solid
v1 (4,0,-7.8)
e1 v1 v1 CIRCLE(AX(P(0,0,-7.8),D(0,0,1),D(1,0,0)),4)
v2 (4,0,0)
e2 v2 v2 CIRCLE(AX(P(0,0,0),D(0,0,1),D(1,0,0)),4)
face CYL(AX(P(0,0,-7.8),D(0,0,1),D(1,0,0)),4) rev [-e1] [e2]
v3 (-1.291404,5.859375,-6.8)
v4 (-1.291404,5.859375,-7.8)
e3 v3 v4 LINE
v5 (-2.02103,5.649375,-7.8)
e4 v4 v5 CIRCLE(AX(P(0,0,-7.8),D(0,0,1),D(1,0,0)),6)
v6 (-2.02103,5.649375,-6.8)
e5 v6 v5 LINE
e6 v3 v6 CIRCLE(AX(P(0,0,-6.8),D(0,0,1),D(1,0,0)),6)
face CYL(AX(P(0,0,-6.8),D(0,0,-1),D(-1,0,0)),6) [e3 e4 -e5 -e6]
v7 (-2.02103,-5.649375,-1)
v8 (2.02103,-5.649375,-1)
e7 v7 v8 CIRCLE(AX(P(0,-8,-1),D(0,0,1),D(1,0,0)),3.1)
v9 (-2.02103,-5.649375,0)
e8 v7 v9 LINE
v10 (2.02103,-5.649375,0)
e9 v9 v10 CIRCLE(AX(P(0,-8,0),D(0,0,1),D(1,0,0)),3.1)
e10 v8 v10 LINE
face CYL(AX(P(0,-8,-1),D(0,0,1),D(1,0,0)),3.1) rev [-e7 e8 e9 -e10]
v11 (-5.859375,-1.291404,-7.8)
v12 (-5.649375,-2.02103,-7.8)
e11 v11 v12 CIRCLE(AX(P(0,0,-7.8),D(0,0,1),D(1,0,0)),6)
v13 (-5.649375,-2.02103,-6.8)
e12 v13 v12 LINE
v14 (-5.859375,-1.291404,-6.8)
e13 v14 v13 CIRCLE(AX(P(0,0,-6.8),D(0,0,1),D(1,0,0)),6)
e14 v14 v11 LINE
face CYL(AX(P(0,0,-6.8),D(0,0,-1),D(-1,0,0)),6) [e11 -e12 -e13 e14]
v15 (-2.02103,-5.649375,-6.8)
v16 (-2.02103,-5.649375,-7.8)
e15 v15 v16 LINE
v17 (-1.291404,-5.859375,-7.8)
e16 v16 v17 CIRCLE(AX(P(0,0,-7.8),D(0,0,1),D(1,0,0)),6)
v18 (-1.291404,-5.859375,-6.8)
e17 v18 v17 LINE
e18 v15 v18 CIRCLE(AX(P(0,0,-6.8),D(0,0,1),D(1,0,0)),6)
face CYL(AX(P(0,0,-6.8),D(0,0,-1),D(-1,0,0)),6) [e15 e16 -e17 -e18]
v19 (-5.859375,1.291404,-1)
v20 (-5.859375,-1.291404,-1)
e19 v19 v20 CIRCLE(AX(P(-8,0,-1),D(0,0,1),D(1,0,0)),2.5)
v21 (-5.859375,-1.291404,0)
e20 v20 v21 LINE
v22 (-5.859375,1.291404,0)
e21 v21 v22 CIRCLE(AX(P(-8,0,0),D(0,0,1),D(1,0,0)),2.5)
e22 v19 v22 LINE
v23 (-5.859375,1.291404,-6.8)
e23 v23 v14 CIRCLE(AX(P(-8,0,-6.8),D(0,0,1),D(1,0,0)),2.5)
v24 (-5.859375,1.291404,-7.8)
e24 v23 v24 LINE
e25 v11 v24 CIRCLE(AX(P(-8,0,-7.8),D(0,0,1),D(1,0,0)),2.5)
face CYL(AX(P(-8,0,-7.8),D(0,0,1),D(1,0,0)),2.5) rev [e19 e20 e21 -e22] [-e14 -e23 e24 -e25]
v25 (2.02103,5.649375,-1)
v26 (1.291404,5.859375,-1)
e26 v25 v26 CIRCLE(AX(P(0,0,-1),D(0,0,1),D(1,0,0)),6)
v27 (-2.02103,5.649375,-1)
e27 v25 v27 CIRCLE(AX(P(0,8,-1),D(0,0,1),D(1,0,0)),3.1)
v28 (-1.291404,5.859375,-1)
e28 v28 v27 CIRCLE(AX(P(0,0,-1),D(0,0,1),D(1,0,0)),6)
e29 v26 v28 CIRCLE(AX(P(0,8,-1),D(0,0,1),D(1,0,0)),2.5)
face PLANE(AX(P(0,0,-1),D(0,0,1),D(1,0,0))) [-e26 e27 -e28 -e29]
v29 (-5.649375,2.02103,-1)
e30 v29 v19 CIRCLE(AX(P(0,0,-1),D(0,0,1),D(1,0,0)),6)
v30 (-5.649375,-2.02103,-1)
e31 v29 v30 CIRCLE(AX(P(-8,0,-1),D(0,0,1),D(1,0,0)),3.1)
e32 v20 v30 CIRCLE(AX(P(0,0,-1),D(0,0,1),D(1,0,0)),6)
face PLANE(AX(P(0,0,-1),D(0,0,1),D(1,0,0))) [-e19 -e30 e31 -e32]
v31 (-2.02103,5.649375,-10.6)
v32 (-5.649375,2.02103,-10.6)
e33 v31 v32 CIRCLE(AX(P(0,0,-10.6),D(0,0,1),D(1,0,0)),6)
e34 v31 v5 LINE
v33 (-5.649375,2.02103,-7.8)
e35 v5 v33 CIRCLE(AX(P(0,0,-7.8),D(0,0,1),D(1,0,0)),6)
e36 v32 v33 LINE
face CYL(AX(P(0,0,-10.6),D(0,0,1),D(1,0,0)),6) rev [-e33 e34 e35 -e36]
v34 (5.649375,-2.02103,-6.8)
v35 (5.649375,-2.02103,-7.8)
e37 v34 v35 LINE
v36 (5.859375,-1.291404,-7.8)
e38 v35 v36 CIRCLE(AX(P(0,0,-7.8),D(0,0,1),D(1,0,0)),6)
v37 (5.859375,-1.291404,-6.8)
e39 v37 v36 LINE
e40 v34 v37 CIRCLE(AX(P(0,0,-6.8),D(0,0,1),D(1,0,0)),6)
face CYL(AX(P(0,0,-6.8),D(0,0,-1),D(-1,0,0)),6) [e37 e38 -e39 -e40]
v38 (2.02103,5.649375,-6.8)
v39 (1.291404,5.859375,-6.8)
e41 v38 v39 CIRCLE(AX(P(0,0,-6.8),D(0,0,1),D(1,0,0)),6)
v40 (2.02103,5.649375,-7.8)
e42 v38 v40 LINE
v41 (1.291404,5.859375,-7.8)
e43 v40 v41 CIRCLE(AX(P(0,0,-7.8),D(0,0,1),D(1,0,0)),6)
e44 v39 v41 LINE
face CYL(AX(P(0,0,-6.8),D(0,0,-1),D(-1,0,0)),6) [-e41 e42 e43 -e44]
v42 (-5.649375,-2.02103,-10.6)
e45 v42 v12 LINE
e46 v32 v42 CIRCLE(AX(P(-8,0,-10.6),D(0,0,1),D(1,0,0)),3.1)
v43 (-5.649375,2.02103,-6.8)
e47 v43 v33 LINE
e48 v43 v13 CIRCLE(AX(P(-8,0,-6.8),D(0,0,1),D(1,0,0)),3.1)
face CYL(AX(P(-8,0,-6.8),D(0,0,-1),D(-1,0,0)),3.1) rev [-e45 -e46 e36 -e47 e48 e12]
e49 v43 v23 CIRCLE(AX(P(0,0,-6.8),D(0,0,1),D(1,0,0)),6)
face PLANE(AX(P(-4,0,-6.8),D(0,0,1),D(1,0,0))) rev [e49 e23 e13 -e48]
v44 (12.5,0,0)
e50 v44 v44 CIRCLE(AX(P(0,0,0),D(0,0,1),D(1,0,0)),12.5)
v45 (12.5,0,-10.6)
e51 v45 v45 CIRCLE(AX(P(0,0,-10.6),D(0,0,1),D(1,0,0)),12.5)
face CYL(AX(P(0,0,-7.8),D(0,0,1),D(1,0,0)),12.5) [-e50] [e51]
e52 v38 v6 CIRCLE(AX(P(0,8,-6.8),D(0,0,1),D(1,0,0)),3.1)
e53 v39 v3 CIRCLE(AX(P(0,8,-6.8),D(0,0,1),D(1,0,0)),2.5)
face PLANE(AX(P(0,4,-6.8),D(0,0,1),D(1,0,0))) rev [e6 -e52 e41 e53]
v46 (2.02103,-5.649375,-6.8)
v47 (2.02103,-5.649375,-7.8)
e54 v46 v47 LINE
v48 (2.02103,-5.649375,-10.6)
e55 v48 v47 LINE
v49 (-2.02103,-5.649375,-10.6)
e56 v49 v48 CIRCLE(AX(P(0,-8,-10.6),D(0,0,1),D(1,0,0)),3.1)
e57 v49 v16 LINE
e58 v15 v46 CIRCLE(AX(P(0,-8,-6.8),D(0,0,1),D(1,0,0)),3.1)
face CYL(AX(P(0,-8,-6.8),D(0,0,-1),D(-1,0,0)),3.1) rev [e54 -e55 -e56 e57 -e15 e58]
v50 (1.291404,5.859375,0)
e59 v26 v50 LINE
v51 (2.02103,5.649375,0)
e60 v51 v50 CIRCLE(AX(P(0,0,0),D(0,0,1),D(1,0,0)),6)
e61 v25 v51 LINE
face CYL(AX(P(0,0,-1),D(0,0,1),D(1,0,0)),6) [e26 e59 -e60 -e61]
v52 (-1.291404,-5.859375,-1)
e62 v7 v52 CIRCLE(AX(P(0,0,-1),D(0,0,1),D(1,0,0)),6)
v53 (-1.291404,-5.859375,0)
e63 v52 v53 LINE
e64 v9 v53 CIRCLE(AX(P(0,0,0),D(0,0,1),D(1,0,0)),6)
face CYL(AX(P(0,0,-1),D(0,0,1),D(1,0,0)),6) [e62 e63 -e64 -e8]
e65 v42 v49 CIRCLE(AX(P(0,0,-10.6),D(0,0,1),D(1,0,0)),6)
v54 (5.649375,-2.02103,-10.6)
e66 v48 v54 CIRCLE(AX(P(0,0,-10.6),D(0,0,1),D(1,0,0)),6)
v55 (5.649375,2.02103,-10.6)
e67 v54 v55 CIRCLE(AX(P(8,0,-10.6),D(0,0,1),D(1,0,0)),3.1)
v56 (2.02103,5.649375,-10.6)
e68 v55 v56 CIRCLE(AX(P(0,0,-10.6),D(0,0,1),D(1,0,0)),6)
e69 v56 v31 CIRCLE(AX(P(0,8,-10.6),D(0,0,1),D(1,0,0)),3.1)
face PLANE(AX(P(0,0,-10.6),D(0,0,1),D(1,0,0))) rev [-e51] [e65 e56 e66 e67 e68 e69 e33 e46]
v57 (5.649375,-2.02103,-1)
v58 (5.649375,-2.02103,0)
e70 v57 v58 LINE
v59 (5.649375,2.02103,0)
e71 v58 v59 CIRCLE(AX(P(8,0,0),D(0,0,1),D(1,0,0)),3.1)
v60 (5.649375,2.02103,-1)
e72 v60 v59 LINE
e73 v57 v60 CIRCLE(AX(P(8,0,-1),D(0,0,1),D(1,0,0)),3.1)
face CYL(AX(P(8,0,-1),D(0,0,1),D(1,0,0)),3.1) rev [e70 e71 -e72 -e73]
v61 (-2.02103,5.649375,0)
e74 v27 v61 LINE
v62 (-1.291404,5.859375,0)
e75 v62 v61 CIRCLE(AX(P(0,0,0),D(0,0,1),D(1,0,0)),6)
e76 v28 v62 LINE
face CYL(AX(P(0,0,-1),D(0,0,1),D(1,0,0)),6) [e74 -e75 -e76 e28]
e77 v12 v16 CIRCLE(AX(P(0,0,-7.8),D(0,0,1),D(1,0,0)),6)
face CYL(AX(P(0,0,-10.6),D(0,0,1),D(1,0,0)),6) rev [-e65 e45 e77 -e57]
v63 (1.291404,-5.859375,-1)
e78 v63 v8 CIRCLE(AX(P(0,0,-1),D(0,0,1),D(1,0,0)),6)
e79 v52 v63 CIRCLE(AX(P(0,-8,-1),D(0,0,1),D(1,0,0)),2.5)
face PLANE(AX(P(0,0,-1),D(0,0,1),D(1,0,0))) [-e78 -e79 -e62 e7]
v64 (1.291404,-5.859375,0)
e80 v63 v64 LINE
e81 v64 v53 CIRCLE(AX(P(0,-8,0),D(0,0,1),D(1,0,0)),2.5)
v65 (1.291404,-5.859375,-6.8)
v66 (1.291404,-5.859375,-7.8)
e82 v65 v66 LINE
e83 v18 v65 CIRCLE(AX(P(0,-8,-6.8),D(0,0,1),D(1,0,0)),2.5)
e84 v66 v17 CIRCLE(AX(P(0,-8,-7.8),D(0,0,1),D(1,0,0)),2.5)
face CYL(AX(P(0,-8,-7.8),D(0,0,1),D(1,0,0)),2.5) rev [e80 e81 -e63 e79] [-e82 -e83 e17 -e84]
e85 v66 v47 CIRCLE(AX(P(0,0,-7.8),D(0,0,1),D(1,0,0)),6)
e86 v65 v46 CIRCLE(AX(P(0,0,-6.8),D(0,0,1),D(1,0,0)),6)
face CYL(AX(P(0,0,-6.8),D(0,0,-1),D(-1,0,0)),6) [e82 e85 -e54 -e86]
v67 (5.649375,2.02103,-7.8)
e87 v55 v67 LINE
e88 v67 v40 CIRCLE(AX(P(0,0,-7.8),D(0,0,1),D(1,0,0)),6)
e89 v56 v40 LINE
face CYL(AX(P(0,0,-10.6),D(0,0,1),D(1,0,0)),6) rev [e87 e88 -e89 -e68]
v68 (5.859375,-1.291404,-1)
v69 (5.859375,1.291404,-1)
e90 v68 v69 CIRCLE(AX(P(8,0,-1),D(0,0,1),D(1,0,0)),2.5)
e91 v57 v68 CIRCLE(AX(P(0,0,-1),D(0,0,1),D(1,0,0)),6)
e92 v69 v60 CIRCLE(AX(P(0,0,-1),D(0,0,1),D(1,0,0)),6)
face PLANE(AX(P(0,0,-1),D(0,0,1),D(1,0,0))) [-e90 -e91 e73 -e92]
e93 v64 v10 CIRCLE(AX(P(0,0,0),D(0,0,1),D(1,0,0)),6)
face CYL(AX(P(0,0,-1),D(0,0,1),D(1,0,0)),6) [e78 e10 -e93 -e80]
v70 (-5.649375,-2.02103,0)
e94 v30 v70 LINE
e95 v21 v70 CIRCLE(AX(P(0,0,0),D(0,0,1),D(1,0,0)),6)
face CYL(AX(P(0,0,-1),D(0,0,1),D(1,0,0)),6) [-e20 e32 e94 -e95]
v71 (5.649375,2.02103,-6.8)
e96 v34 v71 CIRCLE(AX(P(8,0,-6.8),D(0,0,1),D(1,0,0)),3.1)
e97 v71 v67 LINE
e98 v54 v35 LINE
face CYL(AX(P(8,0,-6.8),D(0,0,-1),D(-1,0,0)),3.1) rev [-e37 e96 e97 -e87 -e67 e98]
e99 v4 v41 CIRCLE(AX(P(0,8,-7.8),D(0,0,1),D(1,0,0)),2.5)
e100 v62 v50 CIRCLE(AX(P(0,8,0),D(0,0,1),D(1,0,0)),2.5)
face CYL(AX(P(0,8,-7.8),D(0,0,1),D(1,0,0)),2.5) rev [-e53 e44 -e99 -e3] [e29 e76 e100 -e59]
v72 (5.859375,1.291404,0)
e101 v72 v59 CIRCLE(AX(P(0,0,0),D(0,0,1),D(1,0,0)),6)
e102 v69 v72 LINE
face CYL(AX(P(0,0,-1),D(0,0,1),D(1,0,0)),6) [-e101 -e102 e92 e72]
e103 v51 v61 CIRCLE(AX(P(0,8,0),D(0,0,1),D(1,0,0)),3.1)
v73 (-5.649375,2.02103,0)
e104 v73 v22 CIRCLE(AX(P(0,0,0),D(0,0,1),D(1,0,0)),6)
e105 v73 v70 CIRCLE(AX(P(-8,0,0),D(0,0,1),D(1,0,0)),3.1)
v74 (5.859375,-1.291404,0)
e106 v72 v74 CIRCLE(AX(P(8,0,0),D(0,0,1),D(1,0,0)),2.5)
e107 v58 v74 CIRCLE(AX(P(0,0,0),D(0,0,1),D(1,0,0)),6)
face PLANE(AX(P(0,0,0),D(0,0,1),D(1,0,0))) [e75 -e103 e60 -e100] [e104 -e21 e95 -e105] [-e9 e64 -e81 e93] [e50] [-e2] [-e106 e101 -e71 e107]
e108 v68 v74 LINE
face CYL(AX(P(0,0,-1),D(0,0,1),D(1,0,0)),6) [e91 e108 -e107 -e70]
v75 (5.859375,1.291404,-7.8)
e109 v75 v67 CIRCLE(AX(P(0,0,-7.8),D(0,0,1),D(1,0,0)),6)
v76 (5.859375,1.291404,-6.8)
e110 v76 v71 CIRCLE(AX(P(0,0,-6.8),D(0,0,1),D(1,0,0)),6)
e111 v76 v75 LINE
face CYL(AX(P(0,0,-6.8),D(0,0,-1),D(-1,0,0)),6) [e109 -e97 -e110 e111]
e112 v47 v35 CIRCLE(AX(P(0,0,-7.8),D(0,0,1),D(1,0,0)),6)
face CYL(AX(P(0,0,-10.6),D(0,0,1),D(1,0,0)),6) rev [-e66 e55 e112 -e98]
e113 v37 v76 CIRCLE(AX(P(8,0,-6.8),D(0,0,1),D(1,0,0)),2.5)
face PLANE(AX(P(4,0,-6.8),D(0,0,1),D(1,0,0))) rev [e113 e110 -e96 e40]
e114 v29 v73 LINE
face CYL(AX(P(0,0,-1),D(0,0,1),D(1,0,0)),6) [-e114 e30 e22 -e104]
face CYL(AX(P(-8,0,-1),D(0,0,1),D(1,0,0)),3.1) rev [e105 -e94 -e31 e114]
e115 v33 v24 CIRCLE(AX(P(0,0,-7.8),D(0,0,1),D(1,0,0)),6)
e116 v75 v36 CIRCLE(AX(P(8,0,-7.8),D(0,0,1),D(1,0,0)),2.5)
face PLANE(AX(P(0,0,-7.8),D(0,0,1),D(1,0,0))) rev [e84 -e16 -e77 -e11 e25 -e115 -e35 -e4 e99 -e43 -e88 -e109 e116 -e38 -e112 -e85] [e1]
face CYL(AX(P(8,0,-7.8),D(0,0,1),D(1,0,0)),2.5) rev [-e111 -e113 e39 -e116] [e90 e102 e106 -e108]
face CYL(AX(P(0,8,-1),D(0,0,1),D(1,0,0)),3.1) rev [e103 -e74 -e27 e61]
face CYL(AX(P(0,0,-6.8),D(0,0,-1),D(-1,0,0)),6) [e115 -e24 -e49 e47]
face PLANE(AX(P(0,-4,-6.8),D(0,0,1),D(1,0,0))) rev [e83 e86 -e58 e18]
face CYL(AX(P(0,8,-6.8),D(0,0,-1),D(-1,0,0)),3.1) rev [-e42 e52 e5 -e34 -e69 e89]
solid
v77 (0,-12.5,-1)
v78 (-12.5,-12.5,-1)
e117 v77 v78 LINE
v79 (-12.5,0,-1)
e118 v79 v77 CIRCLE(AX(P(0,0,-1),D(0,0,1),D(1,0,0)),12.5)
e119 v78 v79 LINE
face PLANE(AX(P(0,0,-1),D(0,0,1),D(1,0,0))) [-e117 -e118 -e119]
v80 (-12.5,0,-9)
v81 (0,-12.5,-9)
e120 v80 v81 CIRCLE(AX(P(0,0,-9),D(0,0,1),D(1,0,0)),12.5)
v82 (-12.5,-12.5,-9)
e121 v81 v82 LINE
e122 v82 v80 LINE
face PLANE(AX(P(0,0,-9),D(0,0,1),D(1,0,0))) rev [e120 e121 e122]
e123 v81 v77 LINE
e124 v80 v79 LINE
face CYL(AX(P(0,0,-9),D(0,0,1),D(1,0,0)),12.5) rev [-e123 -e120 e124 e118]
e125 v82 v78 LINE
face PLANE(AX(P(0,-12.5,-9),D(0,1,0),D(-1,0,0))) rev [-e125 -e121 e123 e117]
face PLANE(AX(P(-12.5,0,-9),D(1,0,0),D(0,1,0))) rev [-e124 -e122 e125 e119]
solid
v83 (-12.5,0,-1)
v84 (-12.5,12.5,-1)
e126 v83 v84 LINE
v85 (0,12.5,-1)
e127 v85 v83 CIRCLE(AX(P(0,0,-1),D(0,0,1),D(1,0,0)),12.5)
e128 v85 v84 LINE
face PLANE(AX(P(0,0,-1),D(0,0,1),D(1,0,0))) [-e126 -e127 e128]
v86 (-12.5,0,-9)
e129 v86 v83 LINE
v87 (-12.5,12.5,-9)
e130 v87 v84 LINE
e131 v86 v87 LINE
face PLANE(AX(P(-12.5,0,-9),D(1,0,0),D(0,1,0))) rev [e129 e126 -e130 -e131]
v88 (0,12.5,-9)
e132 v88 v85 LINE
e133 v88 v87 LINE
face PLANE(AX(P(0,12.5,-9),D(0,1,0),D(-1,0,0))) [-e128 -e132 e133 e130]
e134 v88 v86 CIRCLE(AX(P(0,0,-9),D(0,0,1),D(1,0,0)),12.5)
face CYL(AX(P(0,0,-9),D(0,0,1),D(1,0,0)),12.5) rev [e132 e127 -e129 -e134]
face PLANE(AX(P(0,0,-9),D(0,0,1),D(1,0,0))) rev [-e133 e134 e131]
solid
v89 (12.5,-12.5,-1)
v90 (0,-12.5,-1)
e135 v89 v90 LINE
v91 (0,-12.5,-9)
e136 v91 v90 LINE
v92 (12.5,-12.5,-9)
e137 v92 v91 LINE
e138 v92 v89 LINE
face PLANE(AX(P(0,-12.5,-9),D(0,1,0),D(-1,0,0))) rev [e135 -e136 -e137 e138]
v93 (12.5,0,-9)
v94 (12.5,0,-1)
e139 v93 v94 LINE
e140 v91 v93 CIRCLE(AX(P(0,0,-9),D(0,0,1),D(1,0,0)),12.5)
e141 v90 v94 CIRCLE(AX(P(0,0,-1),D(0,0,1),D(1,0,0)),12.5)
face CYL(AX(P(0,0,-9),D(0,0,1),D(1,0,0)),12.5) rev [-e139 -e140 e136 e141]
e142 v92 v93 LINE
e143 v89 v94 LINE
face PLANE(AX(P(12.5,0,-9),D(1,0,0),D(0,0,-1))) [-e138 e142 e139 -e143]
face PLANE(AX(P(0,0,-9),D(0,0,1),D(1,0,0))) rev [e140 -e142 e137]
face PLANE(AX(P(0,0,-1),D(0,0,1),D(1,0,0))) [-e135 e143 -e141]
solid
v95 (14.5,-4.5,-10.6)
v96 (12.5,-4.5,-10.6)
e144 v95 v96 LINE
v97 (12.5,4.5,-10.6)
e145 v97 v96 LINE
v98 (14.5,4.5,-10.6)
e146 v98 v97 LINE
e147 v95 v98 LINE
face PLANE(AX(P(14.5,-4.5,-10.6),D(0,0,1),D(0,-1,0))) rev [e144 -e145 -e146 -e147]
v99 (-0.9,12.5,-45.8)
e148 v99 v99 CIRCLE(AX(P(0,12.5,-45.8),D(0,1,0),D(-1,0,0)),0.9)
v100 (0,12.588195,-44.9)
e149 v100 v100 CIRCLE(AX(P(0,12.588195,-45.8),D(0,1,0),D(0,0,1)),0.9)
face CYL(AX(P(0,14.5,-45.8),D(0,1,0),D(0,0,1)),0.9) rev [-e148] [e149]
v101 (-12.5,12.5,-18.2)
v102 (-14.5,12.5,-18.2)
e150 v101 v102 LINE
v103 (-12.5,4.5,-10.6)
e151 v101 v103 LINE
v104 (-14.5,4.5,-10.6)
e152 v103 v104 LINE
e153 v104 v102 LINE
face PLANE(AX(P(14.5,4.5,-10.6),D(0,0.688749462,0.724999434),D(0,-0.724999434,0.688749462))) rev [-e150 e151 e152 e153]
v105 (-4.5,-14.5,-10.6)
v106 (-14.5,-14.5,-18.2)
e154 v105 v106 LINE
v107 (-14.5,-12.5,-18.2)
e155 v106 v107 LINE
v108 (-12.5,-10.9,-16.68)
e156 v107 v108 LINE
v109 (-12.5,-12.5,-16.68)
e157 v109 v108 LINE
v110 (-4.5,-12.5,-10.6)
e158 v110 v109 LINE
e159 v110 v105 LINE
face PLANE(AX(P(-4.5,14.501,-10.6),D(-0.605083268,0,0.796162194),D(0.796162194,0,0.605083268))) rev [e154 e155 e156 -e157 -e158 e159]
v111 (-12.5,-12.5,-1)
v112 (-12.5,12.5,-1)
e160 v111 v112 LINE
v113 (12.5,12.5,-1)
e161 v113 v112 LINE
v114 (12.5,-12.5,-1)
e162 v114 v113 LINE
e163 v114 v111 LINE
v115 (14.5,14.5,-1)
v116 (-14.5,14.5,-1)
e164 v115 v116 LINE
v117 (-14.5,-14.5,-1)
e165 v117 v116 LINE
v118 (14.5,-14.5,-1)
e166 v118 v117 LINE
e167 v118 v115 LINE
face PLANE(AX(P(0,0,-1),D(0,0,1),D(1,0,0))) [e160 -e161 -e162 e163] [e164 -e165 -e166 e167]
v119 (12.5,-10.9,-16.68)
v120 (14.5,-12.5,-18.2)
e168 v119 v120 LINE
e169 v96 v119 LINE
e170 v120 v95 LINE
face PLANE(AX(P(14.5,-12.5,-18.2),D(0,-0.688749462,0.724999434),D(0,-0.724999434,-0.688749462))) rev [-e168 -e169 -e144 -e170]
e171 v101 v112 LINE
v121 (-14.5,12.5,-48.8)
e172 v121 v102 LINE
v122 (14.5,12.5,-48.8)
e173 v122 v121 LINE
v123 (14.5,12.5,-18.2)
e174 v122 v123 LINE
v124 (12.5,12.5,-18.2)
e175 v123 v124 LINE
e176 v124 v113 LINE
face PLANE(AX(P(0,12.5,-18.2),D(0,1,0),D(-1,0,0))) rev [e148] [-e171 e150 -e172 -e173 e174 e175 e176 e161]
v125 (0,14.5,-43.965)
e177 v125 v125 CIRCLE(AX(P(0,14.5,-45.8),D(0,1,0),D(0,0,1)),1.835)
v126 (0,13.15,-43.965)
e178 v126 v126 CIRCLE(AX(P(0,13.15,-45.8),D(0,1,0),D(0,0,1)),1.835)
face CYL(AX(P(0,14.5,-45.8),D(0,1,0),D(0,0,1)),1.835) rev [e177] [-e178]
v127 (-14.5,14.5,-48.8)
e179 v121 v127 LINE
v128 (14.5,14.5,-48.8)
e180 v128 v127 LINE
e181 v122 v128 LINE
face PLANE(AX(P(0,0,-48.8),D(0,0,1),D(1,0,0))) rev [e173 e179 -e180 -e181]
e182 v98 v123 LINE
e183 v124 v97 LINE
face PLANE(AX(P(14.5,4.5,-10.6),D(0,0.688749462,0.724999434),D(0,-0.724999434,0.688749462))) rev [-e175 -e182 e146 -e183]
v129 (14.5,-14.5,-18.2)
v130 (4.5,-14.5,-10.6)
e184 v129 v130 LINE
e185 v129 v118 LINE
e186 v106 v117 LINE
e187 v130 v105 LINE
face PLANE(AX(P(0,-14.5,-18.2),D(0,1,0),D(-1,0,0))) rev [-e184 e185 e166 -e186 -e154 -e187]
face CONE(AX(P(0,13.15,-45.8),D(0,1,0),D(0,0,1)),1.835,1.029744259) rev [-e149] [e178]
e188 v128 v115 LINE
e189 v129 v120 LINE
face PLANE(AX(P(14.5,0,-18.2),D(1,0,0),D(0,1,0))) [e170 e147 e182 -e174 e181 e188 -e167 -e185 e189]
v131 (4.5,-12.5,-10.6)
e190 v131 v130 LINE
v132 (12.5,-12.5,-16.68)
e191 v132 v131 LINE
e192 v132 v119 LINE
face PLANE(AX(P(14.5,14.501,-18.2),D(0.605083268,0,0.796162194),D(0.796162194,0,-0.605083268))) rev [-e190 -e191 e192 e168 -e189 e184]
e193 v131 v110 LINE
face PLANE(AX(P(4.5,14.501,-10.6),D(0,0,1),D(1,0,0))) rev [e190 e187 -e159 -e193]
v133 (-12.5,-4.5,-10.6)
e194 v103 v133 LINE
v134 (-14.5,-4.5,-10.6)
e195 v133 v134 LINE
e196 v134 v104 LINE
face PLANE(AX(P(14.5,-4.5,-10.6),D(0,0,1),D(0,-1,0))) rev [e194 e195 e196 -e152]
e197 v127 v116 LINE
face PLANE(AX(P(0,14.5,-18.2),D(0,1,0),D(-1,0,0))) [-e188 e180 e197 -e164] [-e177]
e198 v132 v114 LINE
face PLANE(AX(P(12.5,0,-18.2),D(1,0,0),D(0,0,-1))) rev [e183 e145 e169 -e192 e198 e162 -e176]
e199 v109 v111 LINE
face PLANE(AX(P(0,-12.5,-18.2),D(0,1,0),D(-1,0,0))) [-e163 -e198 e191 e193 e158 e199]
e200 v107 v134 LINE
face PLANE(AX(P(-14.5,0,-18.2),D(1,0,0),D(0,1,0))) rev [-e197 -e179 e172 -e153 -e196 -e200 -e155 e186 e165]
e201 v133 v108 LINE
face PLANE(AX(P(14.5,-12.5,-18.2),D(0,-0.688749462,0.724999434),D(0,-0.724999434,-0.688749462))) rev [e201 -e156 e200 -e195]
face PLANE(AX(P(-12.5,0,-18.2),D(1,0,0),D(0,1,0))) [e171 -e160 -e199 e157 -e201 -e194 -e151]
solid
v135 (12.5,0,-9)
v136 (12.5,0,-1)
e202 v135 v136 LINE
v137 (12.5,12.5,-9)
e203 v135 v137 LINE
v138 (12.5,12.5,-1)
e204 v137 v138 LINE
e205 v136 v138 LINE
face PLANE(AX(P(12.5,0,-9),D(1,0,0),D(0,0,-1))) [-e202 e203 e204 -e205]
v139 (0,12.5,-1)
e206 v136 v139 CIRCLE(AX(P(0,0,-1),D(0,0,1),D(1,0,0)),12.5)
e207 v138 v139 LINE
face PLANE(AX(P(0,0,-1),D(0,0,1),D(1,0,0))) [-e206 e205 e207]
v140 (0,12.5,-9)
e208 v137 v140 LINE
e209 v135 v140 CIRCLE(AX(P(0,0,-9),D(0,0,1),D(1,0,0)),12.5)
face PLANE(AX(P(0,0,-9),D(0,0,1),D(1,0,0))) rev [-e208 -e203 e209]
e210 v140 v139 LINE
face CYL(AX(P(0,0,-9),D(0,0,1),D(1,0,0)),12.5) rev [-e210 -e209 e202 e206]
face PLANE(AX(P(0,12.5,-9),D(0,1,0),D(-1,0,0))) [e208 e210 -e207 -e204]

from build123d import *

# Parameters (mm, degrees)
SKETCH_3_R          = 12.5
SKETCH_3_R_2        = 4
SKETCH_3_R_3        = 2.5
EXTRUDE_2_DEPTH     = 7.8
CUT_EXTRUDE_1_DEPTH = 1
CUT_EXTRUDE_START   = -6.8
CUT_EXTRUDE_2_DEPTH = 1
EXTRUDE_START       = -7.8
SKETCH_3_6_R        = 12.5
EXTRUDE_3_DEPTH     = 2.8
EXTRUDE_START_2     = -1
EXTRUDE_4_DEPTH     = 8
EXTRUDE_4_2_DEPTH   = 8
EXTRUDE_4_3_DEPTH   = 8
EXTRUDE_4_4_DEPTH   = 8
EXTRUDE_6_DEPTH     = 17.2
EXTRUDE_START_3     = -18.2
EXTRUDE_13_DEPTH    = 30.6
CUT_EXTRUDE_3_DEPTH = 59.58916282
CUT_EXTRUDE_START_2 = -3.6
CUT_EXTRUDE_4_DEPTH = 3.6


with BuildPart() as part:
    # 草图3 → 凸台-拉伸2 (new body)
    with BuildSketch(Plane.XY):
        Circle(SKETCH_3_R)
        Circle(SKETCH_3_R_2, mode=Mode.SUBTRACT)
        with Locations((0, 8)):
            Circle(SKETCH_3_R_3, mode=Mode.SUBTRACT)
        with Locations((8, 0)):
            Circle(SKETCH_3_R_3, mode=Mode.SUBTRACT)
        with Locations((0, -8)):
            Circle(SKETCH_3_R_3, mode=Mode.SUBTRACT)
        with Locations((-8, 0)):
            Circle(SKETCH_3_R_3, mode=Mode.SUBTRACT)
    extrude(amount=-EXTRUDE_2_DEPTH)

    # 草图3<3> → 切除-拉伸1 (cut)
    with BuildSketch(Plane.XY):
        with BuildLine():
            ThreePointArc((2.021029963, 5.649375), (0, 11.1), (-2.021029963, 5.649375))
            ThreePointArc((-2.021029963, 5.649375), (-1.659542073, 5.765927515), (-1.291404123, 5.859375))
            ThreePointArc((-1.291404123, 5.859375), (0, 10.5), (1.291404123, 5.859375))
            ThreePointArc((1.291404123, 5.859375), (1.659542073, 5.765927515), (2.021029963, 5.649375))
        make_face()
        with BuildLine():
            ThreePointArc((-5.859375, 1.291404123), (-5.765927515, 1.659542073), (-5.649375, 2.021029963))
            ThreePointArc((-5.649375, 2.021029963), (-11.1, 0), (-5.649375, -2.021029963))
            ThreePointArc((-5.649375, -2.021029963), (-5.765927515, -1.659542073), (-5.859375, -1.291404123))
            ThreePointArc((-5.859375, -1.291404123), (-10.5, 0), (-5.859375, 1.291404123))
        make_face()
        with BuildLine():
            ThreePointArc((5.649375, -2.021029963), (11.1, 0), (5.649375, 2.021029963))
            ThreePointArc((5.649375, 2.021029963), (5.765927515, 1.659542073), (5.859375, 1.291404123))
            ThreePointArc((5.859375, 1.291404123), (10.5, 0), (5.859375, -1.291404123))
            ThreePointArc((5.859375, -1.291404123), (5.765927515, -1.659542073), (5.649375, -2.021029963))
        make_face()
        with BuildLine():
            ThreePointArc((-1.291404123, -5.859375), (-1.659542073, -5.765927515), (-2.021029963, -5.649375))
            ThreePointArc((-2.021029963, -5.649375), (0, -11.1), (2.021029963, -5.649375))
            ThreePointArc((2.021029963, -5.649375), (1.659542073, -5.765927515), (1.291404123, -5.859375))
            ThreePointArc((1.291404123, -5.859375), (0, -10.5), (-1.291404123, -5.859375))
        make_face()
    extrude(amount=-CUT_EXTRUDE_1_DEPTH, mode=Mode.SUBTRACT)

    # 草图3<4> → 切除-拉伸2 (cut)
    with BuildSketch(Plane.XY.offset(CUT_EXTRUDE_START)):
        with BuildLine():
            ThreePointArc((2.021029963, 5.649375), (0, 11.1), (-2.021029963, 5.649375))
            ThreePointArc((-2.021029963, 5.649375), (-1.659542073, 5.765927515), (-1.291404123, 5.859375))
            ThreePointArc((-1.291404123, 5.859375), (0, 10.5), (1.291404123, 5.859375))
            ThreePointArc((1.291404123, 5.859375), (1.659542073, 5.765927515), (2.021029963, 5.649375))
        make_face()
        with BuildLine():
            ThreePointArc((-5.859375, 1.291404123), (-5.765927515, 1.659542073), (-5.649375, 2.021029963))
            ThreePointArc((-5.649375, 2.021029963), (-11.1, 0), (-5.649375, -2.021029963))
            ThreePointArc((-5.649375, -2.021029963), (-5.765927515, -1.659542073), (-5.859375, -1.291404123))
            ThreePointArc((-5.859375, -1.291404123), (-10.5, 0), (-5.859375, 1.291404123))
        make_face()
        with BuildLine():
            ThreePointArc((5.649375, -2.021029963), (11.1, 0), (5.649375, 2.021029963))
            ThreePointArc((5.649375, 2.021029963), (5.765927515, 1.659542073), (5.859375, 1.291404123))
            ThreePointArc((5.859375, 1.291404123), (10.5, 0), (5.859375, -1.291404123))
            ThreePointArc((5.859375, -1.291404123), (5.765927515, -1.659542073), (5.649375, -2.021029963))
        make_face()
        with BuildLine():
            ThreePointArc((-1.291404123, -5.859375), (-1.659542073, -5.765927515), (-2.021029963, -5.649375))
            ThreePointArc((-2.021029963, -5.649375), (0, -11.1), (2.021029963, -5.649375))
            ThreePointArc((2.021029963, -5.649375), (1.659542073, -5.765927515), (1.291404123, -5.859375))
            ThreePointArc((1.291404123, -5.859375), (0, -10.5), (-1.291404123, -5.859375))
        make_face()
    extrude(amount=-CUT_EXTRUDE_2_DEPTH, mode=Mode.SUBTRACT)

    # 草图3<6> → 凸台-拉伸3 (add)
    with BuildSketch(Plane.XY.offset(EXTRUDE_START)):
        Circle(SKETCH_3_6_R)
        with BuildLine():
            ThreePointArc((-2.021029963, 5.649375), (-1.293214429, 10.817374033), (3.1, 8))
            ThreePointArc((3.1, 8), (2.817374033, 6.706785571), (2.021029963, 5.649375))
            ThreePointArc((2.021029963, 5.649375), (4.242640687, 4.242640687), (5.649375, 2.021029963))
            ThreePointArc((5.649375, 2.021029963), (9.077743592, 2.906624976), (11.1, 0))
            ThreePointArc((11.1, 0), (9.077743592, -2.906624976), (5.649375, -2.021029963))
            ThreePointArc((5.649375, -2.021029963), (4.242640687, -4.242640687), (2.021029963, -5.649375))
            ThreePointArc((2.021029963, -5.649375), (2.817374033, -6.706785571), (3.1, -8))
            ThreePointArc((3.1, -8), (-1.293214429, -10.817374033), (-2.021029963, -5.649375))
            ThreePointArc((-2.021029963, -5.649375), (-4.242640687, -4.242640687), (-5.649375, -2.021029963))
            ThreePointArc((-5.649375, -2.021029963), (-11.1, 0), (-5.649375, 2.021029963))
            ThreePointArc((-5.649375, 2.021029963), (-4.242640687, 4.242640687), (-2.021029963, 5.649375))
        make_face(mode=Mode.SUBTRACT)
    extrude(amount=-EXTRUDE_3_DEPTH)


with BuildPart() as body_2:
    # 草图5 → 凸台-拉伸4 (new body)
    with BuildSketch(Plane.XY.offset(EXTRUDE_START_2)):
        with BuildLine():
            Line((12.5, -12.5), (12.5, 0))
            ThreePointArc((12.5, 0), (8.838834769, -8.838834761), (1.2e-08, -12.5))
            Line((1.2e-08, -12.5), (12.5, -12.5))
        make_face()
    extrude(amount=-EXTRUDE_4_DEPTH)


with BuildPart() as body_3:
    # 草图5 → Extrude 4 2 (new body)
    with BuildSketch(Plane.XY.offset(EXTRUDE_START_2)):
        with BuildLine():
            ThreePointArc((1.2e-08, -12.5), (-8.838834762, -8.838834768), (-12.5, 4e-09))
            Line((-12.5, 4e-09), (-12.5, -12.5))
            Line((-12.5, -12.5), (1.2e-08, -12.5))
        make_face()
    extrude(amount=-EXTRUDE_4_2_DEPTH)


with BuildPart() as body_4:
    # 草图5 → Extrude 4 3 (new body)
    with BuildSketch(Plane.XY.offset(EXTRUDE_START_2)):
        with BuildLine():
            Line((12.5, 12.5), (-1.7e-08, 12.5))
            ThreePointArc((-1.7e-08, 12.5), (8.838834759, 8.838834771), (12.5, 0))
            Line((12.5, 0), (12.5, 12.5))
        make_face()
    extrude(amount=-EXTRUDE_4_3_DEPTH)


with BuildPart() as body_5:
    # 草图5 → Extrude 4 4 (new body)
    with BuildSketch(Plane.XY.offset(EXTRUDE_START_2)):
        with BuildLine():
            Line((-1.7e-08, 12.5), (-12.5, 12.5))
            Line((-12.5, 12.5), (-12.5, 4e-09))
            ThreePointArc((-12.5, 4e-09), (-8.838834769, 8.83883476), (-1.7e-08, 12.5))
        make_face()
    extrude(amount=-EXTRUDE_4_4_DEPTH)


with BuildPart() as body_6:
    # 草图5<5> → 凸台-拉伸6 (new body)
    with BuildSketch(Plane.XY.offset(EXTRUDE_START_2)):
        Polygon((-12.5, 2.4e-08), (-12.5, 12.5), (-14.5, 12.5), (-14.5, -14.5), (14.5, -14.5), (14.5, 12.5), (12.5, 12.5), (12.5, 0), (12.5, -12.5), (2.4e-08, -12.5), (-12.5, -12.5), align=None)
        Polygon((-14.5, 12.5), (-12.5, 12.5), (0, 12.5), (12.5, 12.5), (14.5, 12.5), (14.5, 14.5), (-14.5, 14.5), align=None)
    extrude(amount=-EXTRUDE_6_DEPTH)

    # 草图5<7> → 凸台-拉伸13 (add)
    with BuildSketch(Plane.XY.offset(EXTRUDE_START_3)):
        Polygon((-14.5, 12.5), (-12.5, 12.5), (0, 12.5), (12.5, 12.5), (14.5, 12.5), (14.5, 14.5), (-14.5, 14.5), align=None)
    extrude(amount=-EXTRUDE_13_DEPTH)

    # 草图8 → 切除-拉伸3 (cut, through all)
    with BuildSketch(Plane.ZY.offset(14.5)):
        Polygon((-10.6, -4.5), (-10.6, 4.5), (-18.2, 12.5), (-18.2, -12.5), align=None)
    extrude(amount=-CUT_EXTRUDE_3_DEPTH, mode=Mode.SUBTRACT)

    # 草图9 → 切除-拉伸4 (cut)
    with BuildSketch(Plane.XZ.offset(14.5).offset(CUT_EXTRUDE_START_2)):
        Polygon((-14.5, -18.2), (14.5, -18.2), (4.5, -10.6), (-4.5, -10.6), align=None)
    extrude(amount=CUT_EXTRUDE_4_DEPTH, mode=Mode.SUBTRACT)

    # 草图10 → 孔1 (revolve, cut)
    with BuildSketch(Plane(origin=(0, 14.5, -45.8), x_dir=(0, 0, 1), z_dir=(1, 0, 0))):
        Polygon((0, 0), (0, 5.35), (0.9, 5.35), (0.9, 1.911804679), (1.835, 1.35), (1.835, 0), align=None)
    revolve(axis=Axis((0, 20.630023899, -45.8), (0, -1, 0)), mode=Mode.SUBTRACT)


solid = Compound([part.part, body_2.part, body_3.part, body_4.part, body_5.part, body_6.part])
